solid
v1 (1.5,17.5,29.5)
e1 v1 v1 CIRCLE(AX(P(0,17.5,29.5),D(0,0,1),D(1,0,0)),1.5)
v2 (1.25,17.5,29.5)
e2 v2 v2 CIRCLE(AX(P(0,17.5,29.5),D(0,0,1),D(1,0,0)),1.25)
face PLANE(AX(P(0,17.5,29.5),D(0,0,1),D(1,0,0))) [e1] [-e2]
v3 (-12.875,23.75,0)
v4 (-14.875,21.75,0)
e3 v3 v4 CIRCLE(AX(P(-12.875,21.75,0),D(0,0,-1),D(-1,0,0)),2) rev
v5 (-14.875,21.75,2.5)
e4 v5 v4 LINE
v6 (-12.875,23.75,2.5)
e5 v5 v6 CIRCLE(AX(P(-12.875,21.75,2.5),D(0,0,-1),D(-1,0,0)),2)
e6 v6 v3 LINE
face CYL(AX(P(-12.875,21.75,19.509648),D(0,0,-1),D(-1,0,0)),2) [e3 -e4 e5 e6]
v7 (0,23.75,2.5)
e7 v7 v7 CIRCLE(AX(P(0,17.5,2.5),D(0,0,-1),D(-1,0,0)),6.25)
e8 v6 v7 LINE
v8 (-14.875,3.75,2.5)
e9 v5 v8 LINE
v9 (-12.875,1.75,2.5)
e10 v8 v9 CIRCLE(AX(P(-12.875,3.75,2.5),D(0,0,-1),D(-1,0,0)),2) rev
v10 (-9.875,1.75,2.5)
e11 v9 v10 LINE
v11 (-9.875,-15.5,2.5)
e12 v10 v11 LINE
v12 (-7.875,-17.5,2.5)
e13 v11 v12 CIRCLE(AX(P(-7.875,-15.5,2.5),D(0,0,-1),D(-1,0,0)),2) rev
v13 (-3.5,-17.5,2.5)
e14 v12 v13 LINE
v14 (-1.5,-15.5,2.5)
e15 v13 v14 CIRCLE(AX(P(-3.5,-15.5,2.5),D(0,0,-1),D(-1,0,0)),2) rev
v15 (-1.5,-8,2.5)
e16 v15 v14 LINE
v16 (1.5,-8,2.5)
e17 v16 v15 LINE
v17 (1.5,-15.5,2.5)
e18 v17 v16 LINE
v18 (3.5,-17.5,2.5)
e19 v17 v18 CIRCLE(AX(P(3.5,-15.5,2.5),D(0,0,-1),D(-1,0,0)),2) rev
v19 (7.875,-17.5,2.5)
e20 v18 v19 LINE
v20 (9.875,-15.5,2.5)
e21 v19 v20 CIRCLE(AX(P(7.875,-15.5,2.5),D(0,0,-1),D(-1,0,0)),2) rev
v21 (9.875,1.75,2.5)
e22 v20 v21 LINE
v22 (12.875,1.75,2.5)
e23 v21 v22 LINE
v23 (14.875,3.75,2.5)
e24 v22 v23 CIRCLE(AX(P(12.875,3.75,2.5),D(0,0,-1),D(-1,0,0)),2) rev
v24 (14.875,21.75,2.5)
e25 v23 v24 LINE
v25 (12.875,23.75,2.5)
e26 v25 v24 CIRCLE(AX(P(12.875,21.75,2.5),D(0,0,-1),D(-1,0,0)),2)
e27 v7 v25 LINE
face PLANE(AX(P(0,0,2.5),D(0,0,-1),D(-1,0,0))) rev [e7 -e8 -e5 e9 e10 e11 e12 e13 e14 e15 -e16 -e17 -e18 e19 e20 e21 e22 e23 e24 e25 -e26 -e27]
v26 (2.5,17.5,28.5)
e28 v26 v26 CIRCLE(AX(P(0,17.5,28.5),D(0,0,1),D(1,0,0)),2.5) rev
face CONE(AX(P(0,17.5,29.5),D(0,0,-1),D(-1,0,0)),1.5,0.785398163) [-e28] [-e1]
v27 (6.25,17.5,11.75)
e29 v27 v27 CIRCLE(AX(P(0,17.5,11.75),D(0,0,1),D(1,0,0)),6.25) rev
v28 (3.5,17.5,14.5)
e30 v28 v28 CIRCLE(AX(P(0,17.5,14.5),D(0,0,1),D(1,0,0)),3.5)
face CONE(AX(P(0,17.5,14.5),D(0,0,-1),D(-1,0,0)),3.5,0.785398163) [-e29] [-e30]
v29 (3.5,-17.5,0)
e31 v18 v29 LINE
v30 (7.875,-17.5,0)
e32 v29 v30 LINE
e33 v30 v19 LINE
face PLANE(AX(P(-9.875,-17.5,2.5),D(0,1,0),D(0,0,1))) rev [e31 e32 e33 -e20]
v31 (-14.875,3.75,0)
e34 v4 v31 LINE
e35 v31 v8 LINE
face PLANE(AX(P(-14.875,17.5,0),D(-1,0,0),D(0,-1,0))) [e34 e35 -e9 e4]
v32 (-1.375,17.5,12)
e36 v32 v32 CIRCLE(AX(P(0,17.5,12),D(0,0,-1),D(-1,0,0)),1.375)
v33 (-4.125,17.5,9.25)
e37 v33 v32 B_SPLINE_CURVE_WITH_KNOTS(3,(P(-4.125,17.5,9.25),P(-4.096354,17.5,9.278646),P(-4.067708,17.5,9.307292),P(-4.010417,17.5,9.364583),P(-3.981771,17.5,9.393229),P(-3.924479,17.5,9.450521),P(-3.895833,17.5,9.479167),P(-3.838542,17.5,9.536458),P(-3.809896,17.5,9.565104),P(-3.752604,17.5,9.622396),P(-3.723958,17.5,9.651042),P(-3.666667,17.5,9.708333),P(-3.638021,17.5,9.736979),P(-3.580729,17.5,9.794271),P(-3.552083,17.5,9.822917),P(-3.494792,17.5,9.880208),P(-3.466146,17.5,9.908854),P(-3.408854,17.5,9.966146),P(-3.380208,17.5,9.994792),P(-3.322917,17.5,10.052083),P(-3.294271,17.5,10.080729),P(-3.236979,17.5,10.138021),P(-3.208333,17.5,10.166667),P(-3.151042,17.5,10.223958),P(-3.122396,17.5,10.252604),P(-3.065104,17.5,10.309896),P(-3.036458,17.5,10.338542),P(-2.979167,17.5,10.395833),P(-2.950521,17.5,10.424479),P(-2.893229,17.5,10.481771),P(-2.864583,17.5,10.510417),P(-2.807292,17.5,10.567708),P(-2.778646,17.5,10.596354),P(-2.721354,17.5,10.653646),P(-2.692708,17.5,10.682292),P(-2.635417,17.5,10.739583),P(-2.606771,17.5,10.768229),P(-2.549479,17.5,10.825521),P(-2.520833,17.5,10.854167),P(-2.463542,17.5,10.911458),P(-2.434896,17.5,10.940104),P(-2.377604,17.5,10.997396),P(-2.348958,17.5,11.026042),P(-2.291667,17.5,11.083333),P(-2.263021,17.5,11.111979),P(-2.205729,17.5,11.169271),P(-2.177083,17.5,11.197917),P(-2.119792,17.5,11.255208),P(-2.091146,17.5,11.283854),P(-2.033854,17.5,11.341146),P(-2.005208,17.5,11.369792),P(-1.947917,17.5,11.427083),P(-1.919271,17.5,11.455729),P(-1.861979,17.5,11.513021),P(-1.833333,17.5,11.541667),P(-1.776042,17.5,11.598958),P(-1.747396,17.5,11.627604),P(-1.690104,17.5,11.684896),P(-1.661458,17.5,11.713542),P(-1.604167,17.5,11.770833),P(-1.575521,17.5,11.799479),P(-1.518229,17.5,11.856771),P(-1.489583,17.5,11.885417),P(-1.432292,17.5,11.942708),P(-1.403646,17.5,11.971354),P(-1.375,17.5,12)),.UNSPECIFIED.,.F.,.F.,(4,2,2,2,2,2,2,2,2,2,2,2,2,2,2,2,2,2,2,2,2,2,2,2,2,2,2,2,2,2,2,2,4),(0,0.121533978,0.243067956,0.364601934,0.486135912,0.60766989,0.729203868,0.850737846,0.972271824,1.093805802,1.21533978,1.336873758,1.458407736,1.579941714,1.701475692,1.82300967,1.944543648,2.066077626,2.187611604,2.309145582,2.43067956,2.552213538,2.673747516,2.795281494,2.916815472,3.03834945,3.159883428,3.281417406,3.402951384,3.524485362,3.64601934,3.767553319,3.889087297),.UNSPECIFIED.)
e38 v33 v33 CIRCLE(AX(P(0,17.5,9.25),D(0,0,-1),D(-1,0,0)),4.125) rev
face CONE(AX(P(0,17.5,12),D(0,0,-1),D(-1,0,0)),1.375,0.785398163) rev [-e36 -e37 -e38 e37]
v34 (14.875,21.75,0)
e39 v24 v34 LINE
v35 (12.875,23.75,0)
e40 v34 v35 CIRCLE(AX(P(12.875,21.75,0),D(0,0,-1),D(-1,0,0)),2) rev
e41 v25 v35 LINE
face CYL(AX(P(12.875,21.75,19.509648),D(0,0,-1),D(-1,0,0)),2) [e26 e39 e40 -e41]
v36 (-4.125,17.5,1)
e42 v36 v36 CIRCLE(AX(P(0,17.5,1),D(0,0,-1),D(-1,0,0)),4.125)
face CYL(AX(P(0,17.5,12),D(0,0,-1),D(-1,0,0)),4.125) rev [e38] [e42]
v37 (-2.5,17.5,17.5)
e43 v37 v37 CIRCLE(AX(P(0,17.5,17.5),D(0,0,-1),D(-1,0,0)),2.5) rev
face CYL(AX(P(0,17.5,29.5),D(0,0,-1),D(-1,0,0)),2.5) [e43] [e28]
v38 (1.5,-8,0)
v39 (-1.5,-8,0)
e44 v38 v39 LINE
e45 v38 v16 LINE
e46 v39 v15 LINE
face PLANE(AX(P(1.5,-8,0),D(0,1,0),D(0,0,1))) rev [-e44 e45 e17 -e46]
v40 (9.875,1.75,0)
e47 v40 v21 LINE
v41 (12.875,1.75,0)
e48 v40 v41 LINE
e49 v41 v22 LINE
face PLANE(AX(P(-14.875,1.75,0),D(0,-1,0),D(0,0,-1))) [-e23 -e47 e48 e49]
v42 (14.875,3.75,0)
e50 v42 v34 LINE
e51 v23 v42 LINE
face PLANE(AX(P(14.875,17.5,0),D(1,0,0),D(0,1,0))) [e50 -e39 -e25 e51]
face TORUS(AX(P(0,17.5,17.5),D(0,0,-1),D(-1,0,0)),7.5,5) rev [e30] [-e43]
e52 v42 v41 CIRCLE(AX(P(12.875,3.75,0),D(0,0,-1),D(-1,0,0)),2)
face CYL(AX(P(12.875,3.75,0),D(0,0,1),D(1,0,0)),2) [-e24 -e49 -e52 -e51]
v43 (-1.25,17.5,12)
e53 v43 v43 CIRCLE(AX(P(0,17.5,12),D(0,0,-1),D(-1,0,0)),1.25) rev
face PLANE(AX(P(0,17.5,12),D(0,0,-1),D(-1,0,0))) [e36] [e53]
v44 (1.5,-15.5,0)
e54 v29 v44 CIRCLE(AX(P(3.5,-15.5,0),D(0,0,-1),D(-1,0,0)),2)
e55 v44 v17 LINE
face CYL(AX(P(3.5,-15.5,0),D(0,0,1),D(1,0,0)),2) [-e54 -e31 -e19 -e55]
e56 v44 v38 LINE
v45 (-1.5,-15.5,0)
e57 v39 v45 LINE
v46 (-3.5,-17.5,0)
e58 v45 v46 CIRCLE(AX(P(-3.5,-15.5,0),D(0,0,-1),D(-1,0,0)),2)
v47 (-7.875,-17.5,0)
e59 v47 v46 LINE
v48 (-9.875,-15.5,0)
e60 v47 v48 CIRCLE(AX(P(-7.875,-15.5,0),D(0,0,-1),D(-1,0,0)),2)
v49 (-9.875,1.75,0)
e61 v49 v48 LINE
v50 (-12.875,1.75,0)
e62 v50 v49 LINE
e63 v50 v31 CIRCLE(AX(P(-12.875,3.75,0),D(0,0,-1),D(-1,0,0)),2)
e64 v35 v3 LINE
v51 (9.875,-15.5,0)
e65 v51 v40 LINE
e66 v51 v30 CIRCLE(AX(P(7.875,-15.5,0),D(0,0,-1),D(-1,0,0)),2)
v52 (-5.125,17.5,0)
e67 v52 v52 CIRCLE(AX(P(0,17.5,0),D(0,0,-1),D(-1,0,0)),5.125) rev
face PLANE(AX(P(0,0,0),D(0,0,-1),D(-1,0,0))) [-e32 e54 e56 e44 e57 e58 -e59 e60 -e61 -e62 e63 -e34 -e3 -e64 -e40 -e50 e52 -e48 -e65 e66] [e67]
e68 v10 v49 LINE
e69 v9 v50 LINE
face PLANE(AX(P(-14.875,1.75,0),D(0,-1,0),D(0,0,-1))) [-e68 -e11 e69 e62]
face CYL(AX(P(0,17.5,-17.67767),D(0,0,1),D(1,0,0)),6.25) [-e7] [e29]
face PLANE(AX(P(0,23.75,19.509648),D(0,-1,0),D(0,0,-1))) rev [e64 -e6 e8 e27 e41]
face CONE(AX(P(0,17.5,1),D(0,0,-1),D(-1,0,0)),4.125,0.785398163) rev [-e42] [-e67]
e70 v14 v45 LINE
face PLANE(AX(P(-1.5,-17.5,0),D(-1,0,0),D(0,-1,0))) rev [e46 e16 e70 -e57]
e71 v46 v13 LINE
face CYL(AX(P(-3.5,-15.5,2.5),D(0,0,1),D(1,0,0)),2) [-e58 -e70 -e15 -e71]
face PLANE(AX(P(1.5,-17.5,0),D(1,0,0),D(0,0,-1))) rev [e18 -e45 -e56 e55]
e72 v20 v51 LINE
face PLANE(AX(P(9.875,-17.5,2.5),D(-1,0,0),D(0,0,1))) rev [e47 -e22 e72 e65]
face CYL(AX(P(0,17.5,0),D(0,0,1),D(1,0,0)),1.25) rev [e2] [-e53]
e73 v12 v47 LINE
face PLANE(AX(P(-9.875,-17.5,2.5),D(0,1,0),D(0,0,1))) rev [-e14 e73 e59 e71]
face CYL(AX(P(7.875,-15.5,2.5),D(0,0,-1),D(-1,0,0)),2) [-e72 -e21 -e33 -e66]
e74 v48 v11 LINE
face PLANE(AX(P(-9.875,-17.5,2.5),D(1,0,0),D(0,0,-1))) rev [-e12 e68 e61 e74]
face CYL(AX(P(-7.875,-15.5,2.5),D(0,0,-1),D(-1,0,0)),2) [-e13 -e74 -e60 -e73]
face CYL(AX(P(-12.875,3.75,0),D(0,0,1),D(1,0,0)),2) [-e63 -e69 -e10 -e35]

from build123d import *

# Parameters (mm, degrees)
CROQUIS1_W                          = 19.75
CROQUIS1_H                          = 35
SALIENTE_EXTRUIR1_DEPTH             = 2.5
CROQUIS2_W                          = 3
CROQUIS2_H                          = 9.5
CORTAR_EXTRUIR1_DEPTH               = 21.24884256
CROQUIS3_W                          = 29.75
CROQUIS3_H                          = 15.75
SALIENTE_EXTRUIR2_DEPTH             = 2.5
CROQUIS7_R                          = 6.25
SALIENTE_EXTRUIR4_DEPTH             = 12
SALIENTE_EXTRUIR4_DIRECTION_2_REACH = 25.103
CROQUIS4_R                          = 2.5
SALIENTE_EXTRUIR3_DEPTH             = 15
CROQUIS5_R                          = 1.25
CORTAR_EXTRUIR2_DEPTH               = 41.688796062
CROQUIS10_R                         = 4.125
CORTAR_EXTRUIR3_DEPTH               = 12
CHAFL_N1_SIZE                       = 1
REDONDEO1_R                         = 2
CHAFL_N2_SIZE                       = 2.75
REDONDEO2_R                         = 5
SALIENTE_EXTRUIR5_DEPTH             = 2.5


with BuildPart() as part:
    # Croquis1 → Saliente-Extruir1 (new body)
    with BuildSketch(Plane.XY):
        Rectangle(CROQUIS1_W, CROQUIS1_H)
    extrude(amount=SALIENTE_EXTRUIR1_DEPTH)

    # Croquis2 → Cortar-Extruir1 (cut, through all)
    with BuildSketch(Plane.XY.offset(2.5)):
        with Locations((0, -12.75)):
            Rectangle(CROQUIS2_W, CROQUIS2_H)
    extrude(amount=-CORTAR_EXTRUIR1_DEPTH, mode=Mode.SUBTRACT)

    # Croquis3 → Saliente-Extruir2 (add, through all)
    with BuildSketch(Plane.XY.offset(2.5)):
        with Locations((0, 9.625)):
            Rectangle(CROQUIS3_W, CROQUIS3_H)
    extrude(amount=-SALIENTE_EXTRUIR2_DEPTH)

    # Croquis7 → Saliente-Extruir4 (add)
    with BuildSketch(Plane.XY.offset(2.5)):
        with Locations((0, 17.5)):
            Circle(CROQUIS7_R)
    extrude(amount=SALIENTE_EXTRUIR4_DEPTH)

    # Saliente-Extruir4 direction 2: up to this face of the body (flat: up to its plane)
    saliente_extruir4_direction_2_end = Plane(part.part.faces().sort_by_distance((0, 2.291145992, 0))[0])
    # Croquis7 → Saliente-Extruir4 direction 2 (add, up to the picked face)
    with BuildSketch(Plane.XY.offset(2.5), mode=Mode.PRIVATE) as saliente_extruir4_direction_2_sk1:
        with Locations((0, 17.5)):
            Circle(CROQUIS7_R)
    saliente_extruir4_direction_2_tool1 = split(extrude(saliente_extruir4_direction_2_sk1.sketch, amount=-SALIENTE_EXTRUIR4_DIRECTION_2_REACH, mode=Mode.PRIVATE), bisect_by=saliente_extruir4_direction_2_end, keep=Keep.BOTH, mode=Mode.PRIVATE)
    add(saliente_extruir4_direction_2_tool1.solids().sort_by(Axis((0, 17.5, 2.5), (0, 0, -1)))[0])

    # Croquis4 → Saliente-Extruir3 (add)
    with BuildSketch(Plane.XY.offset(14.5)):
        with Locations((0, 17.5)):
            Circle(CROQUIS4_R)
    extrude(amount=SALIENTE_EXTRUIR3_DEPTH)

    # Croquis5 → Cortar-Extruir2 (cut, through all)
    with BuildSketch(Plane.XY.offset(29.5)):
        with Locations((0, 17.5)):
            Circle(CROQUIS5_R)
    extrude(amount=-CORTAR_EXTRUIR2_DEPTH, mode=Mode.SUBTRACT)

    # Croquis10 → Cortar-Extruir3 (cut)
    with BuildSketch(Plane(origin=(0, 0, 0), x_dir=(-1, 0, 0), z_dir=(0, 0, -1))):
        with Locations((0, 17.5)):
            Circle(CROQUIS10_R)
    extrude(amount=-CORTAR_EXTRUIR3_DEPTH, mode=Mode.SUBTRACT)

    # Chaflán1
    chafl_n1_edges = [part.edges().sort_by_distance(p)[0] for p in [
        (-2.5, 17.5, 29.5),
        (4.125, 17.5, 0),
    ]]
    chamfer(chafl_n1_edges, length=CHAFL_N1_SIZE)

    # Redondeo1
    redondeo1_edges = [part.edges().sort_by_distance(p)[0] for p in [
        (1.5, -17.5, 1.25),
        (-1.5, -17.5, 1.25),
        (-14.875, 17.5, 1.25),
        (14.875, 1.75, 1.25),
        (-14.875, 1.75, 1.25),
        (14.875, 17.5, 1.25),
        (9.875, -17.5, 1.25),
        (-9.875, -17.5, 1.25),
    ]]
    fillet(redondeo1_edges, radius=REDONDEO1_R)

    # Chaflán2
    chafl_n2_edges = [part.edges().sort_by_distance(p)[0] for p in [
        (-6.25, 17.5, 14.5),
        (4.125, 17.5, 12),
    ]]
    chamfer(chafl_n2_edges, length=CHAFL_N2_SIZE)

    # Redondeo2
    # the kernel refuses this fillet: 5 mm, written as the material it adds along each edge
    with BuildSketch(Plane(origin=(0, 17.5, 14.5), x_dir=(1, 0, 0), z_dir=(0, -1, 0))) as redondeo2_piece_1:
        with BuildLine():
            CenterArc((7.5, 3), REDONDEO2_R, 180, 36.869897646)
            Line((2.5, 3), (2.4, 3))
            Line((2.4, 3), (2.4, 0))
            Line((2.4, 0), (2.5, -0.1))
            ThreePointArc((2.5, -0.1), (3, -0.1), (3.42, -0.06))
            Line((3.42, -0.06), (3.5, 0))
        make_face()
    revolve(axis=Axis((0, 17.5, 14.5), (0, 0, 1)))

    # Croquis11 → Saliente-Extruir5 (add)
    with BuildSketch(Plane(origin=(0, 0, 0), x_dir=(-1, 0, 0), z_dir=(0, 0, -1))):
        with BuildLine():
            ThreePointArc((-6.25, 17.5), (-4.419417386, 21.919417379), (-1e-08, 23.75))
            Line((-1e-08, 23.75), (-12.875, 23.75))
            ThreePointArc((-12.875, 23.75), (-14.289213562, 23.164213562), (-14.875, 21.75))
            Line((-14.875, 21.75), (-14.875, 15.5))
            ThreePointArc((-14.875, 15.5), (-14.289213562, 16.914213562), (-12.875, 17.5))
            Line((-12.875, 17.5), (-6.25, 17.5))
        make_face()
        with BuildLine():
            ThreePointArc((-1e-08, 23.75), (4.419417379, 21.919417386), (6.25, 17.5))
            Line((6.25, 17.5), (12.875, 17.5))
            ThreePointArc((12.875, 17.5), (14.289213562, 16.914213562), (14.875, 15.5))
            Line((14.875, 15.5), (14.875, 21.75))
            ThreePointArc((14.875, 21.75), (14.289213562, 23.164213562), (12.875, 23.75))
            Line((12.875, 23.75), (-1e-08, 23.75))
        make_face()
    extrude(amount=-SALIENTE_EXTRUIR5_DEPTH)


solid = part.part
